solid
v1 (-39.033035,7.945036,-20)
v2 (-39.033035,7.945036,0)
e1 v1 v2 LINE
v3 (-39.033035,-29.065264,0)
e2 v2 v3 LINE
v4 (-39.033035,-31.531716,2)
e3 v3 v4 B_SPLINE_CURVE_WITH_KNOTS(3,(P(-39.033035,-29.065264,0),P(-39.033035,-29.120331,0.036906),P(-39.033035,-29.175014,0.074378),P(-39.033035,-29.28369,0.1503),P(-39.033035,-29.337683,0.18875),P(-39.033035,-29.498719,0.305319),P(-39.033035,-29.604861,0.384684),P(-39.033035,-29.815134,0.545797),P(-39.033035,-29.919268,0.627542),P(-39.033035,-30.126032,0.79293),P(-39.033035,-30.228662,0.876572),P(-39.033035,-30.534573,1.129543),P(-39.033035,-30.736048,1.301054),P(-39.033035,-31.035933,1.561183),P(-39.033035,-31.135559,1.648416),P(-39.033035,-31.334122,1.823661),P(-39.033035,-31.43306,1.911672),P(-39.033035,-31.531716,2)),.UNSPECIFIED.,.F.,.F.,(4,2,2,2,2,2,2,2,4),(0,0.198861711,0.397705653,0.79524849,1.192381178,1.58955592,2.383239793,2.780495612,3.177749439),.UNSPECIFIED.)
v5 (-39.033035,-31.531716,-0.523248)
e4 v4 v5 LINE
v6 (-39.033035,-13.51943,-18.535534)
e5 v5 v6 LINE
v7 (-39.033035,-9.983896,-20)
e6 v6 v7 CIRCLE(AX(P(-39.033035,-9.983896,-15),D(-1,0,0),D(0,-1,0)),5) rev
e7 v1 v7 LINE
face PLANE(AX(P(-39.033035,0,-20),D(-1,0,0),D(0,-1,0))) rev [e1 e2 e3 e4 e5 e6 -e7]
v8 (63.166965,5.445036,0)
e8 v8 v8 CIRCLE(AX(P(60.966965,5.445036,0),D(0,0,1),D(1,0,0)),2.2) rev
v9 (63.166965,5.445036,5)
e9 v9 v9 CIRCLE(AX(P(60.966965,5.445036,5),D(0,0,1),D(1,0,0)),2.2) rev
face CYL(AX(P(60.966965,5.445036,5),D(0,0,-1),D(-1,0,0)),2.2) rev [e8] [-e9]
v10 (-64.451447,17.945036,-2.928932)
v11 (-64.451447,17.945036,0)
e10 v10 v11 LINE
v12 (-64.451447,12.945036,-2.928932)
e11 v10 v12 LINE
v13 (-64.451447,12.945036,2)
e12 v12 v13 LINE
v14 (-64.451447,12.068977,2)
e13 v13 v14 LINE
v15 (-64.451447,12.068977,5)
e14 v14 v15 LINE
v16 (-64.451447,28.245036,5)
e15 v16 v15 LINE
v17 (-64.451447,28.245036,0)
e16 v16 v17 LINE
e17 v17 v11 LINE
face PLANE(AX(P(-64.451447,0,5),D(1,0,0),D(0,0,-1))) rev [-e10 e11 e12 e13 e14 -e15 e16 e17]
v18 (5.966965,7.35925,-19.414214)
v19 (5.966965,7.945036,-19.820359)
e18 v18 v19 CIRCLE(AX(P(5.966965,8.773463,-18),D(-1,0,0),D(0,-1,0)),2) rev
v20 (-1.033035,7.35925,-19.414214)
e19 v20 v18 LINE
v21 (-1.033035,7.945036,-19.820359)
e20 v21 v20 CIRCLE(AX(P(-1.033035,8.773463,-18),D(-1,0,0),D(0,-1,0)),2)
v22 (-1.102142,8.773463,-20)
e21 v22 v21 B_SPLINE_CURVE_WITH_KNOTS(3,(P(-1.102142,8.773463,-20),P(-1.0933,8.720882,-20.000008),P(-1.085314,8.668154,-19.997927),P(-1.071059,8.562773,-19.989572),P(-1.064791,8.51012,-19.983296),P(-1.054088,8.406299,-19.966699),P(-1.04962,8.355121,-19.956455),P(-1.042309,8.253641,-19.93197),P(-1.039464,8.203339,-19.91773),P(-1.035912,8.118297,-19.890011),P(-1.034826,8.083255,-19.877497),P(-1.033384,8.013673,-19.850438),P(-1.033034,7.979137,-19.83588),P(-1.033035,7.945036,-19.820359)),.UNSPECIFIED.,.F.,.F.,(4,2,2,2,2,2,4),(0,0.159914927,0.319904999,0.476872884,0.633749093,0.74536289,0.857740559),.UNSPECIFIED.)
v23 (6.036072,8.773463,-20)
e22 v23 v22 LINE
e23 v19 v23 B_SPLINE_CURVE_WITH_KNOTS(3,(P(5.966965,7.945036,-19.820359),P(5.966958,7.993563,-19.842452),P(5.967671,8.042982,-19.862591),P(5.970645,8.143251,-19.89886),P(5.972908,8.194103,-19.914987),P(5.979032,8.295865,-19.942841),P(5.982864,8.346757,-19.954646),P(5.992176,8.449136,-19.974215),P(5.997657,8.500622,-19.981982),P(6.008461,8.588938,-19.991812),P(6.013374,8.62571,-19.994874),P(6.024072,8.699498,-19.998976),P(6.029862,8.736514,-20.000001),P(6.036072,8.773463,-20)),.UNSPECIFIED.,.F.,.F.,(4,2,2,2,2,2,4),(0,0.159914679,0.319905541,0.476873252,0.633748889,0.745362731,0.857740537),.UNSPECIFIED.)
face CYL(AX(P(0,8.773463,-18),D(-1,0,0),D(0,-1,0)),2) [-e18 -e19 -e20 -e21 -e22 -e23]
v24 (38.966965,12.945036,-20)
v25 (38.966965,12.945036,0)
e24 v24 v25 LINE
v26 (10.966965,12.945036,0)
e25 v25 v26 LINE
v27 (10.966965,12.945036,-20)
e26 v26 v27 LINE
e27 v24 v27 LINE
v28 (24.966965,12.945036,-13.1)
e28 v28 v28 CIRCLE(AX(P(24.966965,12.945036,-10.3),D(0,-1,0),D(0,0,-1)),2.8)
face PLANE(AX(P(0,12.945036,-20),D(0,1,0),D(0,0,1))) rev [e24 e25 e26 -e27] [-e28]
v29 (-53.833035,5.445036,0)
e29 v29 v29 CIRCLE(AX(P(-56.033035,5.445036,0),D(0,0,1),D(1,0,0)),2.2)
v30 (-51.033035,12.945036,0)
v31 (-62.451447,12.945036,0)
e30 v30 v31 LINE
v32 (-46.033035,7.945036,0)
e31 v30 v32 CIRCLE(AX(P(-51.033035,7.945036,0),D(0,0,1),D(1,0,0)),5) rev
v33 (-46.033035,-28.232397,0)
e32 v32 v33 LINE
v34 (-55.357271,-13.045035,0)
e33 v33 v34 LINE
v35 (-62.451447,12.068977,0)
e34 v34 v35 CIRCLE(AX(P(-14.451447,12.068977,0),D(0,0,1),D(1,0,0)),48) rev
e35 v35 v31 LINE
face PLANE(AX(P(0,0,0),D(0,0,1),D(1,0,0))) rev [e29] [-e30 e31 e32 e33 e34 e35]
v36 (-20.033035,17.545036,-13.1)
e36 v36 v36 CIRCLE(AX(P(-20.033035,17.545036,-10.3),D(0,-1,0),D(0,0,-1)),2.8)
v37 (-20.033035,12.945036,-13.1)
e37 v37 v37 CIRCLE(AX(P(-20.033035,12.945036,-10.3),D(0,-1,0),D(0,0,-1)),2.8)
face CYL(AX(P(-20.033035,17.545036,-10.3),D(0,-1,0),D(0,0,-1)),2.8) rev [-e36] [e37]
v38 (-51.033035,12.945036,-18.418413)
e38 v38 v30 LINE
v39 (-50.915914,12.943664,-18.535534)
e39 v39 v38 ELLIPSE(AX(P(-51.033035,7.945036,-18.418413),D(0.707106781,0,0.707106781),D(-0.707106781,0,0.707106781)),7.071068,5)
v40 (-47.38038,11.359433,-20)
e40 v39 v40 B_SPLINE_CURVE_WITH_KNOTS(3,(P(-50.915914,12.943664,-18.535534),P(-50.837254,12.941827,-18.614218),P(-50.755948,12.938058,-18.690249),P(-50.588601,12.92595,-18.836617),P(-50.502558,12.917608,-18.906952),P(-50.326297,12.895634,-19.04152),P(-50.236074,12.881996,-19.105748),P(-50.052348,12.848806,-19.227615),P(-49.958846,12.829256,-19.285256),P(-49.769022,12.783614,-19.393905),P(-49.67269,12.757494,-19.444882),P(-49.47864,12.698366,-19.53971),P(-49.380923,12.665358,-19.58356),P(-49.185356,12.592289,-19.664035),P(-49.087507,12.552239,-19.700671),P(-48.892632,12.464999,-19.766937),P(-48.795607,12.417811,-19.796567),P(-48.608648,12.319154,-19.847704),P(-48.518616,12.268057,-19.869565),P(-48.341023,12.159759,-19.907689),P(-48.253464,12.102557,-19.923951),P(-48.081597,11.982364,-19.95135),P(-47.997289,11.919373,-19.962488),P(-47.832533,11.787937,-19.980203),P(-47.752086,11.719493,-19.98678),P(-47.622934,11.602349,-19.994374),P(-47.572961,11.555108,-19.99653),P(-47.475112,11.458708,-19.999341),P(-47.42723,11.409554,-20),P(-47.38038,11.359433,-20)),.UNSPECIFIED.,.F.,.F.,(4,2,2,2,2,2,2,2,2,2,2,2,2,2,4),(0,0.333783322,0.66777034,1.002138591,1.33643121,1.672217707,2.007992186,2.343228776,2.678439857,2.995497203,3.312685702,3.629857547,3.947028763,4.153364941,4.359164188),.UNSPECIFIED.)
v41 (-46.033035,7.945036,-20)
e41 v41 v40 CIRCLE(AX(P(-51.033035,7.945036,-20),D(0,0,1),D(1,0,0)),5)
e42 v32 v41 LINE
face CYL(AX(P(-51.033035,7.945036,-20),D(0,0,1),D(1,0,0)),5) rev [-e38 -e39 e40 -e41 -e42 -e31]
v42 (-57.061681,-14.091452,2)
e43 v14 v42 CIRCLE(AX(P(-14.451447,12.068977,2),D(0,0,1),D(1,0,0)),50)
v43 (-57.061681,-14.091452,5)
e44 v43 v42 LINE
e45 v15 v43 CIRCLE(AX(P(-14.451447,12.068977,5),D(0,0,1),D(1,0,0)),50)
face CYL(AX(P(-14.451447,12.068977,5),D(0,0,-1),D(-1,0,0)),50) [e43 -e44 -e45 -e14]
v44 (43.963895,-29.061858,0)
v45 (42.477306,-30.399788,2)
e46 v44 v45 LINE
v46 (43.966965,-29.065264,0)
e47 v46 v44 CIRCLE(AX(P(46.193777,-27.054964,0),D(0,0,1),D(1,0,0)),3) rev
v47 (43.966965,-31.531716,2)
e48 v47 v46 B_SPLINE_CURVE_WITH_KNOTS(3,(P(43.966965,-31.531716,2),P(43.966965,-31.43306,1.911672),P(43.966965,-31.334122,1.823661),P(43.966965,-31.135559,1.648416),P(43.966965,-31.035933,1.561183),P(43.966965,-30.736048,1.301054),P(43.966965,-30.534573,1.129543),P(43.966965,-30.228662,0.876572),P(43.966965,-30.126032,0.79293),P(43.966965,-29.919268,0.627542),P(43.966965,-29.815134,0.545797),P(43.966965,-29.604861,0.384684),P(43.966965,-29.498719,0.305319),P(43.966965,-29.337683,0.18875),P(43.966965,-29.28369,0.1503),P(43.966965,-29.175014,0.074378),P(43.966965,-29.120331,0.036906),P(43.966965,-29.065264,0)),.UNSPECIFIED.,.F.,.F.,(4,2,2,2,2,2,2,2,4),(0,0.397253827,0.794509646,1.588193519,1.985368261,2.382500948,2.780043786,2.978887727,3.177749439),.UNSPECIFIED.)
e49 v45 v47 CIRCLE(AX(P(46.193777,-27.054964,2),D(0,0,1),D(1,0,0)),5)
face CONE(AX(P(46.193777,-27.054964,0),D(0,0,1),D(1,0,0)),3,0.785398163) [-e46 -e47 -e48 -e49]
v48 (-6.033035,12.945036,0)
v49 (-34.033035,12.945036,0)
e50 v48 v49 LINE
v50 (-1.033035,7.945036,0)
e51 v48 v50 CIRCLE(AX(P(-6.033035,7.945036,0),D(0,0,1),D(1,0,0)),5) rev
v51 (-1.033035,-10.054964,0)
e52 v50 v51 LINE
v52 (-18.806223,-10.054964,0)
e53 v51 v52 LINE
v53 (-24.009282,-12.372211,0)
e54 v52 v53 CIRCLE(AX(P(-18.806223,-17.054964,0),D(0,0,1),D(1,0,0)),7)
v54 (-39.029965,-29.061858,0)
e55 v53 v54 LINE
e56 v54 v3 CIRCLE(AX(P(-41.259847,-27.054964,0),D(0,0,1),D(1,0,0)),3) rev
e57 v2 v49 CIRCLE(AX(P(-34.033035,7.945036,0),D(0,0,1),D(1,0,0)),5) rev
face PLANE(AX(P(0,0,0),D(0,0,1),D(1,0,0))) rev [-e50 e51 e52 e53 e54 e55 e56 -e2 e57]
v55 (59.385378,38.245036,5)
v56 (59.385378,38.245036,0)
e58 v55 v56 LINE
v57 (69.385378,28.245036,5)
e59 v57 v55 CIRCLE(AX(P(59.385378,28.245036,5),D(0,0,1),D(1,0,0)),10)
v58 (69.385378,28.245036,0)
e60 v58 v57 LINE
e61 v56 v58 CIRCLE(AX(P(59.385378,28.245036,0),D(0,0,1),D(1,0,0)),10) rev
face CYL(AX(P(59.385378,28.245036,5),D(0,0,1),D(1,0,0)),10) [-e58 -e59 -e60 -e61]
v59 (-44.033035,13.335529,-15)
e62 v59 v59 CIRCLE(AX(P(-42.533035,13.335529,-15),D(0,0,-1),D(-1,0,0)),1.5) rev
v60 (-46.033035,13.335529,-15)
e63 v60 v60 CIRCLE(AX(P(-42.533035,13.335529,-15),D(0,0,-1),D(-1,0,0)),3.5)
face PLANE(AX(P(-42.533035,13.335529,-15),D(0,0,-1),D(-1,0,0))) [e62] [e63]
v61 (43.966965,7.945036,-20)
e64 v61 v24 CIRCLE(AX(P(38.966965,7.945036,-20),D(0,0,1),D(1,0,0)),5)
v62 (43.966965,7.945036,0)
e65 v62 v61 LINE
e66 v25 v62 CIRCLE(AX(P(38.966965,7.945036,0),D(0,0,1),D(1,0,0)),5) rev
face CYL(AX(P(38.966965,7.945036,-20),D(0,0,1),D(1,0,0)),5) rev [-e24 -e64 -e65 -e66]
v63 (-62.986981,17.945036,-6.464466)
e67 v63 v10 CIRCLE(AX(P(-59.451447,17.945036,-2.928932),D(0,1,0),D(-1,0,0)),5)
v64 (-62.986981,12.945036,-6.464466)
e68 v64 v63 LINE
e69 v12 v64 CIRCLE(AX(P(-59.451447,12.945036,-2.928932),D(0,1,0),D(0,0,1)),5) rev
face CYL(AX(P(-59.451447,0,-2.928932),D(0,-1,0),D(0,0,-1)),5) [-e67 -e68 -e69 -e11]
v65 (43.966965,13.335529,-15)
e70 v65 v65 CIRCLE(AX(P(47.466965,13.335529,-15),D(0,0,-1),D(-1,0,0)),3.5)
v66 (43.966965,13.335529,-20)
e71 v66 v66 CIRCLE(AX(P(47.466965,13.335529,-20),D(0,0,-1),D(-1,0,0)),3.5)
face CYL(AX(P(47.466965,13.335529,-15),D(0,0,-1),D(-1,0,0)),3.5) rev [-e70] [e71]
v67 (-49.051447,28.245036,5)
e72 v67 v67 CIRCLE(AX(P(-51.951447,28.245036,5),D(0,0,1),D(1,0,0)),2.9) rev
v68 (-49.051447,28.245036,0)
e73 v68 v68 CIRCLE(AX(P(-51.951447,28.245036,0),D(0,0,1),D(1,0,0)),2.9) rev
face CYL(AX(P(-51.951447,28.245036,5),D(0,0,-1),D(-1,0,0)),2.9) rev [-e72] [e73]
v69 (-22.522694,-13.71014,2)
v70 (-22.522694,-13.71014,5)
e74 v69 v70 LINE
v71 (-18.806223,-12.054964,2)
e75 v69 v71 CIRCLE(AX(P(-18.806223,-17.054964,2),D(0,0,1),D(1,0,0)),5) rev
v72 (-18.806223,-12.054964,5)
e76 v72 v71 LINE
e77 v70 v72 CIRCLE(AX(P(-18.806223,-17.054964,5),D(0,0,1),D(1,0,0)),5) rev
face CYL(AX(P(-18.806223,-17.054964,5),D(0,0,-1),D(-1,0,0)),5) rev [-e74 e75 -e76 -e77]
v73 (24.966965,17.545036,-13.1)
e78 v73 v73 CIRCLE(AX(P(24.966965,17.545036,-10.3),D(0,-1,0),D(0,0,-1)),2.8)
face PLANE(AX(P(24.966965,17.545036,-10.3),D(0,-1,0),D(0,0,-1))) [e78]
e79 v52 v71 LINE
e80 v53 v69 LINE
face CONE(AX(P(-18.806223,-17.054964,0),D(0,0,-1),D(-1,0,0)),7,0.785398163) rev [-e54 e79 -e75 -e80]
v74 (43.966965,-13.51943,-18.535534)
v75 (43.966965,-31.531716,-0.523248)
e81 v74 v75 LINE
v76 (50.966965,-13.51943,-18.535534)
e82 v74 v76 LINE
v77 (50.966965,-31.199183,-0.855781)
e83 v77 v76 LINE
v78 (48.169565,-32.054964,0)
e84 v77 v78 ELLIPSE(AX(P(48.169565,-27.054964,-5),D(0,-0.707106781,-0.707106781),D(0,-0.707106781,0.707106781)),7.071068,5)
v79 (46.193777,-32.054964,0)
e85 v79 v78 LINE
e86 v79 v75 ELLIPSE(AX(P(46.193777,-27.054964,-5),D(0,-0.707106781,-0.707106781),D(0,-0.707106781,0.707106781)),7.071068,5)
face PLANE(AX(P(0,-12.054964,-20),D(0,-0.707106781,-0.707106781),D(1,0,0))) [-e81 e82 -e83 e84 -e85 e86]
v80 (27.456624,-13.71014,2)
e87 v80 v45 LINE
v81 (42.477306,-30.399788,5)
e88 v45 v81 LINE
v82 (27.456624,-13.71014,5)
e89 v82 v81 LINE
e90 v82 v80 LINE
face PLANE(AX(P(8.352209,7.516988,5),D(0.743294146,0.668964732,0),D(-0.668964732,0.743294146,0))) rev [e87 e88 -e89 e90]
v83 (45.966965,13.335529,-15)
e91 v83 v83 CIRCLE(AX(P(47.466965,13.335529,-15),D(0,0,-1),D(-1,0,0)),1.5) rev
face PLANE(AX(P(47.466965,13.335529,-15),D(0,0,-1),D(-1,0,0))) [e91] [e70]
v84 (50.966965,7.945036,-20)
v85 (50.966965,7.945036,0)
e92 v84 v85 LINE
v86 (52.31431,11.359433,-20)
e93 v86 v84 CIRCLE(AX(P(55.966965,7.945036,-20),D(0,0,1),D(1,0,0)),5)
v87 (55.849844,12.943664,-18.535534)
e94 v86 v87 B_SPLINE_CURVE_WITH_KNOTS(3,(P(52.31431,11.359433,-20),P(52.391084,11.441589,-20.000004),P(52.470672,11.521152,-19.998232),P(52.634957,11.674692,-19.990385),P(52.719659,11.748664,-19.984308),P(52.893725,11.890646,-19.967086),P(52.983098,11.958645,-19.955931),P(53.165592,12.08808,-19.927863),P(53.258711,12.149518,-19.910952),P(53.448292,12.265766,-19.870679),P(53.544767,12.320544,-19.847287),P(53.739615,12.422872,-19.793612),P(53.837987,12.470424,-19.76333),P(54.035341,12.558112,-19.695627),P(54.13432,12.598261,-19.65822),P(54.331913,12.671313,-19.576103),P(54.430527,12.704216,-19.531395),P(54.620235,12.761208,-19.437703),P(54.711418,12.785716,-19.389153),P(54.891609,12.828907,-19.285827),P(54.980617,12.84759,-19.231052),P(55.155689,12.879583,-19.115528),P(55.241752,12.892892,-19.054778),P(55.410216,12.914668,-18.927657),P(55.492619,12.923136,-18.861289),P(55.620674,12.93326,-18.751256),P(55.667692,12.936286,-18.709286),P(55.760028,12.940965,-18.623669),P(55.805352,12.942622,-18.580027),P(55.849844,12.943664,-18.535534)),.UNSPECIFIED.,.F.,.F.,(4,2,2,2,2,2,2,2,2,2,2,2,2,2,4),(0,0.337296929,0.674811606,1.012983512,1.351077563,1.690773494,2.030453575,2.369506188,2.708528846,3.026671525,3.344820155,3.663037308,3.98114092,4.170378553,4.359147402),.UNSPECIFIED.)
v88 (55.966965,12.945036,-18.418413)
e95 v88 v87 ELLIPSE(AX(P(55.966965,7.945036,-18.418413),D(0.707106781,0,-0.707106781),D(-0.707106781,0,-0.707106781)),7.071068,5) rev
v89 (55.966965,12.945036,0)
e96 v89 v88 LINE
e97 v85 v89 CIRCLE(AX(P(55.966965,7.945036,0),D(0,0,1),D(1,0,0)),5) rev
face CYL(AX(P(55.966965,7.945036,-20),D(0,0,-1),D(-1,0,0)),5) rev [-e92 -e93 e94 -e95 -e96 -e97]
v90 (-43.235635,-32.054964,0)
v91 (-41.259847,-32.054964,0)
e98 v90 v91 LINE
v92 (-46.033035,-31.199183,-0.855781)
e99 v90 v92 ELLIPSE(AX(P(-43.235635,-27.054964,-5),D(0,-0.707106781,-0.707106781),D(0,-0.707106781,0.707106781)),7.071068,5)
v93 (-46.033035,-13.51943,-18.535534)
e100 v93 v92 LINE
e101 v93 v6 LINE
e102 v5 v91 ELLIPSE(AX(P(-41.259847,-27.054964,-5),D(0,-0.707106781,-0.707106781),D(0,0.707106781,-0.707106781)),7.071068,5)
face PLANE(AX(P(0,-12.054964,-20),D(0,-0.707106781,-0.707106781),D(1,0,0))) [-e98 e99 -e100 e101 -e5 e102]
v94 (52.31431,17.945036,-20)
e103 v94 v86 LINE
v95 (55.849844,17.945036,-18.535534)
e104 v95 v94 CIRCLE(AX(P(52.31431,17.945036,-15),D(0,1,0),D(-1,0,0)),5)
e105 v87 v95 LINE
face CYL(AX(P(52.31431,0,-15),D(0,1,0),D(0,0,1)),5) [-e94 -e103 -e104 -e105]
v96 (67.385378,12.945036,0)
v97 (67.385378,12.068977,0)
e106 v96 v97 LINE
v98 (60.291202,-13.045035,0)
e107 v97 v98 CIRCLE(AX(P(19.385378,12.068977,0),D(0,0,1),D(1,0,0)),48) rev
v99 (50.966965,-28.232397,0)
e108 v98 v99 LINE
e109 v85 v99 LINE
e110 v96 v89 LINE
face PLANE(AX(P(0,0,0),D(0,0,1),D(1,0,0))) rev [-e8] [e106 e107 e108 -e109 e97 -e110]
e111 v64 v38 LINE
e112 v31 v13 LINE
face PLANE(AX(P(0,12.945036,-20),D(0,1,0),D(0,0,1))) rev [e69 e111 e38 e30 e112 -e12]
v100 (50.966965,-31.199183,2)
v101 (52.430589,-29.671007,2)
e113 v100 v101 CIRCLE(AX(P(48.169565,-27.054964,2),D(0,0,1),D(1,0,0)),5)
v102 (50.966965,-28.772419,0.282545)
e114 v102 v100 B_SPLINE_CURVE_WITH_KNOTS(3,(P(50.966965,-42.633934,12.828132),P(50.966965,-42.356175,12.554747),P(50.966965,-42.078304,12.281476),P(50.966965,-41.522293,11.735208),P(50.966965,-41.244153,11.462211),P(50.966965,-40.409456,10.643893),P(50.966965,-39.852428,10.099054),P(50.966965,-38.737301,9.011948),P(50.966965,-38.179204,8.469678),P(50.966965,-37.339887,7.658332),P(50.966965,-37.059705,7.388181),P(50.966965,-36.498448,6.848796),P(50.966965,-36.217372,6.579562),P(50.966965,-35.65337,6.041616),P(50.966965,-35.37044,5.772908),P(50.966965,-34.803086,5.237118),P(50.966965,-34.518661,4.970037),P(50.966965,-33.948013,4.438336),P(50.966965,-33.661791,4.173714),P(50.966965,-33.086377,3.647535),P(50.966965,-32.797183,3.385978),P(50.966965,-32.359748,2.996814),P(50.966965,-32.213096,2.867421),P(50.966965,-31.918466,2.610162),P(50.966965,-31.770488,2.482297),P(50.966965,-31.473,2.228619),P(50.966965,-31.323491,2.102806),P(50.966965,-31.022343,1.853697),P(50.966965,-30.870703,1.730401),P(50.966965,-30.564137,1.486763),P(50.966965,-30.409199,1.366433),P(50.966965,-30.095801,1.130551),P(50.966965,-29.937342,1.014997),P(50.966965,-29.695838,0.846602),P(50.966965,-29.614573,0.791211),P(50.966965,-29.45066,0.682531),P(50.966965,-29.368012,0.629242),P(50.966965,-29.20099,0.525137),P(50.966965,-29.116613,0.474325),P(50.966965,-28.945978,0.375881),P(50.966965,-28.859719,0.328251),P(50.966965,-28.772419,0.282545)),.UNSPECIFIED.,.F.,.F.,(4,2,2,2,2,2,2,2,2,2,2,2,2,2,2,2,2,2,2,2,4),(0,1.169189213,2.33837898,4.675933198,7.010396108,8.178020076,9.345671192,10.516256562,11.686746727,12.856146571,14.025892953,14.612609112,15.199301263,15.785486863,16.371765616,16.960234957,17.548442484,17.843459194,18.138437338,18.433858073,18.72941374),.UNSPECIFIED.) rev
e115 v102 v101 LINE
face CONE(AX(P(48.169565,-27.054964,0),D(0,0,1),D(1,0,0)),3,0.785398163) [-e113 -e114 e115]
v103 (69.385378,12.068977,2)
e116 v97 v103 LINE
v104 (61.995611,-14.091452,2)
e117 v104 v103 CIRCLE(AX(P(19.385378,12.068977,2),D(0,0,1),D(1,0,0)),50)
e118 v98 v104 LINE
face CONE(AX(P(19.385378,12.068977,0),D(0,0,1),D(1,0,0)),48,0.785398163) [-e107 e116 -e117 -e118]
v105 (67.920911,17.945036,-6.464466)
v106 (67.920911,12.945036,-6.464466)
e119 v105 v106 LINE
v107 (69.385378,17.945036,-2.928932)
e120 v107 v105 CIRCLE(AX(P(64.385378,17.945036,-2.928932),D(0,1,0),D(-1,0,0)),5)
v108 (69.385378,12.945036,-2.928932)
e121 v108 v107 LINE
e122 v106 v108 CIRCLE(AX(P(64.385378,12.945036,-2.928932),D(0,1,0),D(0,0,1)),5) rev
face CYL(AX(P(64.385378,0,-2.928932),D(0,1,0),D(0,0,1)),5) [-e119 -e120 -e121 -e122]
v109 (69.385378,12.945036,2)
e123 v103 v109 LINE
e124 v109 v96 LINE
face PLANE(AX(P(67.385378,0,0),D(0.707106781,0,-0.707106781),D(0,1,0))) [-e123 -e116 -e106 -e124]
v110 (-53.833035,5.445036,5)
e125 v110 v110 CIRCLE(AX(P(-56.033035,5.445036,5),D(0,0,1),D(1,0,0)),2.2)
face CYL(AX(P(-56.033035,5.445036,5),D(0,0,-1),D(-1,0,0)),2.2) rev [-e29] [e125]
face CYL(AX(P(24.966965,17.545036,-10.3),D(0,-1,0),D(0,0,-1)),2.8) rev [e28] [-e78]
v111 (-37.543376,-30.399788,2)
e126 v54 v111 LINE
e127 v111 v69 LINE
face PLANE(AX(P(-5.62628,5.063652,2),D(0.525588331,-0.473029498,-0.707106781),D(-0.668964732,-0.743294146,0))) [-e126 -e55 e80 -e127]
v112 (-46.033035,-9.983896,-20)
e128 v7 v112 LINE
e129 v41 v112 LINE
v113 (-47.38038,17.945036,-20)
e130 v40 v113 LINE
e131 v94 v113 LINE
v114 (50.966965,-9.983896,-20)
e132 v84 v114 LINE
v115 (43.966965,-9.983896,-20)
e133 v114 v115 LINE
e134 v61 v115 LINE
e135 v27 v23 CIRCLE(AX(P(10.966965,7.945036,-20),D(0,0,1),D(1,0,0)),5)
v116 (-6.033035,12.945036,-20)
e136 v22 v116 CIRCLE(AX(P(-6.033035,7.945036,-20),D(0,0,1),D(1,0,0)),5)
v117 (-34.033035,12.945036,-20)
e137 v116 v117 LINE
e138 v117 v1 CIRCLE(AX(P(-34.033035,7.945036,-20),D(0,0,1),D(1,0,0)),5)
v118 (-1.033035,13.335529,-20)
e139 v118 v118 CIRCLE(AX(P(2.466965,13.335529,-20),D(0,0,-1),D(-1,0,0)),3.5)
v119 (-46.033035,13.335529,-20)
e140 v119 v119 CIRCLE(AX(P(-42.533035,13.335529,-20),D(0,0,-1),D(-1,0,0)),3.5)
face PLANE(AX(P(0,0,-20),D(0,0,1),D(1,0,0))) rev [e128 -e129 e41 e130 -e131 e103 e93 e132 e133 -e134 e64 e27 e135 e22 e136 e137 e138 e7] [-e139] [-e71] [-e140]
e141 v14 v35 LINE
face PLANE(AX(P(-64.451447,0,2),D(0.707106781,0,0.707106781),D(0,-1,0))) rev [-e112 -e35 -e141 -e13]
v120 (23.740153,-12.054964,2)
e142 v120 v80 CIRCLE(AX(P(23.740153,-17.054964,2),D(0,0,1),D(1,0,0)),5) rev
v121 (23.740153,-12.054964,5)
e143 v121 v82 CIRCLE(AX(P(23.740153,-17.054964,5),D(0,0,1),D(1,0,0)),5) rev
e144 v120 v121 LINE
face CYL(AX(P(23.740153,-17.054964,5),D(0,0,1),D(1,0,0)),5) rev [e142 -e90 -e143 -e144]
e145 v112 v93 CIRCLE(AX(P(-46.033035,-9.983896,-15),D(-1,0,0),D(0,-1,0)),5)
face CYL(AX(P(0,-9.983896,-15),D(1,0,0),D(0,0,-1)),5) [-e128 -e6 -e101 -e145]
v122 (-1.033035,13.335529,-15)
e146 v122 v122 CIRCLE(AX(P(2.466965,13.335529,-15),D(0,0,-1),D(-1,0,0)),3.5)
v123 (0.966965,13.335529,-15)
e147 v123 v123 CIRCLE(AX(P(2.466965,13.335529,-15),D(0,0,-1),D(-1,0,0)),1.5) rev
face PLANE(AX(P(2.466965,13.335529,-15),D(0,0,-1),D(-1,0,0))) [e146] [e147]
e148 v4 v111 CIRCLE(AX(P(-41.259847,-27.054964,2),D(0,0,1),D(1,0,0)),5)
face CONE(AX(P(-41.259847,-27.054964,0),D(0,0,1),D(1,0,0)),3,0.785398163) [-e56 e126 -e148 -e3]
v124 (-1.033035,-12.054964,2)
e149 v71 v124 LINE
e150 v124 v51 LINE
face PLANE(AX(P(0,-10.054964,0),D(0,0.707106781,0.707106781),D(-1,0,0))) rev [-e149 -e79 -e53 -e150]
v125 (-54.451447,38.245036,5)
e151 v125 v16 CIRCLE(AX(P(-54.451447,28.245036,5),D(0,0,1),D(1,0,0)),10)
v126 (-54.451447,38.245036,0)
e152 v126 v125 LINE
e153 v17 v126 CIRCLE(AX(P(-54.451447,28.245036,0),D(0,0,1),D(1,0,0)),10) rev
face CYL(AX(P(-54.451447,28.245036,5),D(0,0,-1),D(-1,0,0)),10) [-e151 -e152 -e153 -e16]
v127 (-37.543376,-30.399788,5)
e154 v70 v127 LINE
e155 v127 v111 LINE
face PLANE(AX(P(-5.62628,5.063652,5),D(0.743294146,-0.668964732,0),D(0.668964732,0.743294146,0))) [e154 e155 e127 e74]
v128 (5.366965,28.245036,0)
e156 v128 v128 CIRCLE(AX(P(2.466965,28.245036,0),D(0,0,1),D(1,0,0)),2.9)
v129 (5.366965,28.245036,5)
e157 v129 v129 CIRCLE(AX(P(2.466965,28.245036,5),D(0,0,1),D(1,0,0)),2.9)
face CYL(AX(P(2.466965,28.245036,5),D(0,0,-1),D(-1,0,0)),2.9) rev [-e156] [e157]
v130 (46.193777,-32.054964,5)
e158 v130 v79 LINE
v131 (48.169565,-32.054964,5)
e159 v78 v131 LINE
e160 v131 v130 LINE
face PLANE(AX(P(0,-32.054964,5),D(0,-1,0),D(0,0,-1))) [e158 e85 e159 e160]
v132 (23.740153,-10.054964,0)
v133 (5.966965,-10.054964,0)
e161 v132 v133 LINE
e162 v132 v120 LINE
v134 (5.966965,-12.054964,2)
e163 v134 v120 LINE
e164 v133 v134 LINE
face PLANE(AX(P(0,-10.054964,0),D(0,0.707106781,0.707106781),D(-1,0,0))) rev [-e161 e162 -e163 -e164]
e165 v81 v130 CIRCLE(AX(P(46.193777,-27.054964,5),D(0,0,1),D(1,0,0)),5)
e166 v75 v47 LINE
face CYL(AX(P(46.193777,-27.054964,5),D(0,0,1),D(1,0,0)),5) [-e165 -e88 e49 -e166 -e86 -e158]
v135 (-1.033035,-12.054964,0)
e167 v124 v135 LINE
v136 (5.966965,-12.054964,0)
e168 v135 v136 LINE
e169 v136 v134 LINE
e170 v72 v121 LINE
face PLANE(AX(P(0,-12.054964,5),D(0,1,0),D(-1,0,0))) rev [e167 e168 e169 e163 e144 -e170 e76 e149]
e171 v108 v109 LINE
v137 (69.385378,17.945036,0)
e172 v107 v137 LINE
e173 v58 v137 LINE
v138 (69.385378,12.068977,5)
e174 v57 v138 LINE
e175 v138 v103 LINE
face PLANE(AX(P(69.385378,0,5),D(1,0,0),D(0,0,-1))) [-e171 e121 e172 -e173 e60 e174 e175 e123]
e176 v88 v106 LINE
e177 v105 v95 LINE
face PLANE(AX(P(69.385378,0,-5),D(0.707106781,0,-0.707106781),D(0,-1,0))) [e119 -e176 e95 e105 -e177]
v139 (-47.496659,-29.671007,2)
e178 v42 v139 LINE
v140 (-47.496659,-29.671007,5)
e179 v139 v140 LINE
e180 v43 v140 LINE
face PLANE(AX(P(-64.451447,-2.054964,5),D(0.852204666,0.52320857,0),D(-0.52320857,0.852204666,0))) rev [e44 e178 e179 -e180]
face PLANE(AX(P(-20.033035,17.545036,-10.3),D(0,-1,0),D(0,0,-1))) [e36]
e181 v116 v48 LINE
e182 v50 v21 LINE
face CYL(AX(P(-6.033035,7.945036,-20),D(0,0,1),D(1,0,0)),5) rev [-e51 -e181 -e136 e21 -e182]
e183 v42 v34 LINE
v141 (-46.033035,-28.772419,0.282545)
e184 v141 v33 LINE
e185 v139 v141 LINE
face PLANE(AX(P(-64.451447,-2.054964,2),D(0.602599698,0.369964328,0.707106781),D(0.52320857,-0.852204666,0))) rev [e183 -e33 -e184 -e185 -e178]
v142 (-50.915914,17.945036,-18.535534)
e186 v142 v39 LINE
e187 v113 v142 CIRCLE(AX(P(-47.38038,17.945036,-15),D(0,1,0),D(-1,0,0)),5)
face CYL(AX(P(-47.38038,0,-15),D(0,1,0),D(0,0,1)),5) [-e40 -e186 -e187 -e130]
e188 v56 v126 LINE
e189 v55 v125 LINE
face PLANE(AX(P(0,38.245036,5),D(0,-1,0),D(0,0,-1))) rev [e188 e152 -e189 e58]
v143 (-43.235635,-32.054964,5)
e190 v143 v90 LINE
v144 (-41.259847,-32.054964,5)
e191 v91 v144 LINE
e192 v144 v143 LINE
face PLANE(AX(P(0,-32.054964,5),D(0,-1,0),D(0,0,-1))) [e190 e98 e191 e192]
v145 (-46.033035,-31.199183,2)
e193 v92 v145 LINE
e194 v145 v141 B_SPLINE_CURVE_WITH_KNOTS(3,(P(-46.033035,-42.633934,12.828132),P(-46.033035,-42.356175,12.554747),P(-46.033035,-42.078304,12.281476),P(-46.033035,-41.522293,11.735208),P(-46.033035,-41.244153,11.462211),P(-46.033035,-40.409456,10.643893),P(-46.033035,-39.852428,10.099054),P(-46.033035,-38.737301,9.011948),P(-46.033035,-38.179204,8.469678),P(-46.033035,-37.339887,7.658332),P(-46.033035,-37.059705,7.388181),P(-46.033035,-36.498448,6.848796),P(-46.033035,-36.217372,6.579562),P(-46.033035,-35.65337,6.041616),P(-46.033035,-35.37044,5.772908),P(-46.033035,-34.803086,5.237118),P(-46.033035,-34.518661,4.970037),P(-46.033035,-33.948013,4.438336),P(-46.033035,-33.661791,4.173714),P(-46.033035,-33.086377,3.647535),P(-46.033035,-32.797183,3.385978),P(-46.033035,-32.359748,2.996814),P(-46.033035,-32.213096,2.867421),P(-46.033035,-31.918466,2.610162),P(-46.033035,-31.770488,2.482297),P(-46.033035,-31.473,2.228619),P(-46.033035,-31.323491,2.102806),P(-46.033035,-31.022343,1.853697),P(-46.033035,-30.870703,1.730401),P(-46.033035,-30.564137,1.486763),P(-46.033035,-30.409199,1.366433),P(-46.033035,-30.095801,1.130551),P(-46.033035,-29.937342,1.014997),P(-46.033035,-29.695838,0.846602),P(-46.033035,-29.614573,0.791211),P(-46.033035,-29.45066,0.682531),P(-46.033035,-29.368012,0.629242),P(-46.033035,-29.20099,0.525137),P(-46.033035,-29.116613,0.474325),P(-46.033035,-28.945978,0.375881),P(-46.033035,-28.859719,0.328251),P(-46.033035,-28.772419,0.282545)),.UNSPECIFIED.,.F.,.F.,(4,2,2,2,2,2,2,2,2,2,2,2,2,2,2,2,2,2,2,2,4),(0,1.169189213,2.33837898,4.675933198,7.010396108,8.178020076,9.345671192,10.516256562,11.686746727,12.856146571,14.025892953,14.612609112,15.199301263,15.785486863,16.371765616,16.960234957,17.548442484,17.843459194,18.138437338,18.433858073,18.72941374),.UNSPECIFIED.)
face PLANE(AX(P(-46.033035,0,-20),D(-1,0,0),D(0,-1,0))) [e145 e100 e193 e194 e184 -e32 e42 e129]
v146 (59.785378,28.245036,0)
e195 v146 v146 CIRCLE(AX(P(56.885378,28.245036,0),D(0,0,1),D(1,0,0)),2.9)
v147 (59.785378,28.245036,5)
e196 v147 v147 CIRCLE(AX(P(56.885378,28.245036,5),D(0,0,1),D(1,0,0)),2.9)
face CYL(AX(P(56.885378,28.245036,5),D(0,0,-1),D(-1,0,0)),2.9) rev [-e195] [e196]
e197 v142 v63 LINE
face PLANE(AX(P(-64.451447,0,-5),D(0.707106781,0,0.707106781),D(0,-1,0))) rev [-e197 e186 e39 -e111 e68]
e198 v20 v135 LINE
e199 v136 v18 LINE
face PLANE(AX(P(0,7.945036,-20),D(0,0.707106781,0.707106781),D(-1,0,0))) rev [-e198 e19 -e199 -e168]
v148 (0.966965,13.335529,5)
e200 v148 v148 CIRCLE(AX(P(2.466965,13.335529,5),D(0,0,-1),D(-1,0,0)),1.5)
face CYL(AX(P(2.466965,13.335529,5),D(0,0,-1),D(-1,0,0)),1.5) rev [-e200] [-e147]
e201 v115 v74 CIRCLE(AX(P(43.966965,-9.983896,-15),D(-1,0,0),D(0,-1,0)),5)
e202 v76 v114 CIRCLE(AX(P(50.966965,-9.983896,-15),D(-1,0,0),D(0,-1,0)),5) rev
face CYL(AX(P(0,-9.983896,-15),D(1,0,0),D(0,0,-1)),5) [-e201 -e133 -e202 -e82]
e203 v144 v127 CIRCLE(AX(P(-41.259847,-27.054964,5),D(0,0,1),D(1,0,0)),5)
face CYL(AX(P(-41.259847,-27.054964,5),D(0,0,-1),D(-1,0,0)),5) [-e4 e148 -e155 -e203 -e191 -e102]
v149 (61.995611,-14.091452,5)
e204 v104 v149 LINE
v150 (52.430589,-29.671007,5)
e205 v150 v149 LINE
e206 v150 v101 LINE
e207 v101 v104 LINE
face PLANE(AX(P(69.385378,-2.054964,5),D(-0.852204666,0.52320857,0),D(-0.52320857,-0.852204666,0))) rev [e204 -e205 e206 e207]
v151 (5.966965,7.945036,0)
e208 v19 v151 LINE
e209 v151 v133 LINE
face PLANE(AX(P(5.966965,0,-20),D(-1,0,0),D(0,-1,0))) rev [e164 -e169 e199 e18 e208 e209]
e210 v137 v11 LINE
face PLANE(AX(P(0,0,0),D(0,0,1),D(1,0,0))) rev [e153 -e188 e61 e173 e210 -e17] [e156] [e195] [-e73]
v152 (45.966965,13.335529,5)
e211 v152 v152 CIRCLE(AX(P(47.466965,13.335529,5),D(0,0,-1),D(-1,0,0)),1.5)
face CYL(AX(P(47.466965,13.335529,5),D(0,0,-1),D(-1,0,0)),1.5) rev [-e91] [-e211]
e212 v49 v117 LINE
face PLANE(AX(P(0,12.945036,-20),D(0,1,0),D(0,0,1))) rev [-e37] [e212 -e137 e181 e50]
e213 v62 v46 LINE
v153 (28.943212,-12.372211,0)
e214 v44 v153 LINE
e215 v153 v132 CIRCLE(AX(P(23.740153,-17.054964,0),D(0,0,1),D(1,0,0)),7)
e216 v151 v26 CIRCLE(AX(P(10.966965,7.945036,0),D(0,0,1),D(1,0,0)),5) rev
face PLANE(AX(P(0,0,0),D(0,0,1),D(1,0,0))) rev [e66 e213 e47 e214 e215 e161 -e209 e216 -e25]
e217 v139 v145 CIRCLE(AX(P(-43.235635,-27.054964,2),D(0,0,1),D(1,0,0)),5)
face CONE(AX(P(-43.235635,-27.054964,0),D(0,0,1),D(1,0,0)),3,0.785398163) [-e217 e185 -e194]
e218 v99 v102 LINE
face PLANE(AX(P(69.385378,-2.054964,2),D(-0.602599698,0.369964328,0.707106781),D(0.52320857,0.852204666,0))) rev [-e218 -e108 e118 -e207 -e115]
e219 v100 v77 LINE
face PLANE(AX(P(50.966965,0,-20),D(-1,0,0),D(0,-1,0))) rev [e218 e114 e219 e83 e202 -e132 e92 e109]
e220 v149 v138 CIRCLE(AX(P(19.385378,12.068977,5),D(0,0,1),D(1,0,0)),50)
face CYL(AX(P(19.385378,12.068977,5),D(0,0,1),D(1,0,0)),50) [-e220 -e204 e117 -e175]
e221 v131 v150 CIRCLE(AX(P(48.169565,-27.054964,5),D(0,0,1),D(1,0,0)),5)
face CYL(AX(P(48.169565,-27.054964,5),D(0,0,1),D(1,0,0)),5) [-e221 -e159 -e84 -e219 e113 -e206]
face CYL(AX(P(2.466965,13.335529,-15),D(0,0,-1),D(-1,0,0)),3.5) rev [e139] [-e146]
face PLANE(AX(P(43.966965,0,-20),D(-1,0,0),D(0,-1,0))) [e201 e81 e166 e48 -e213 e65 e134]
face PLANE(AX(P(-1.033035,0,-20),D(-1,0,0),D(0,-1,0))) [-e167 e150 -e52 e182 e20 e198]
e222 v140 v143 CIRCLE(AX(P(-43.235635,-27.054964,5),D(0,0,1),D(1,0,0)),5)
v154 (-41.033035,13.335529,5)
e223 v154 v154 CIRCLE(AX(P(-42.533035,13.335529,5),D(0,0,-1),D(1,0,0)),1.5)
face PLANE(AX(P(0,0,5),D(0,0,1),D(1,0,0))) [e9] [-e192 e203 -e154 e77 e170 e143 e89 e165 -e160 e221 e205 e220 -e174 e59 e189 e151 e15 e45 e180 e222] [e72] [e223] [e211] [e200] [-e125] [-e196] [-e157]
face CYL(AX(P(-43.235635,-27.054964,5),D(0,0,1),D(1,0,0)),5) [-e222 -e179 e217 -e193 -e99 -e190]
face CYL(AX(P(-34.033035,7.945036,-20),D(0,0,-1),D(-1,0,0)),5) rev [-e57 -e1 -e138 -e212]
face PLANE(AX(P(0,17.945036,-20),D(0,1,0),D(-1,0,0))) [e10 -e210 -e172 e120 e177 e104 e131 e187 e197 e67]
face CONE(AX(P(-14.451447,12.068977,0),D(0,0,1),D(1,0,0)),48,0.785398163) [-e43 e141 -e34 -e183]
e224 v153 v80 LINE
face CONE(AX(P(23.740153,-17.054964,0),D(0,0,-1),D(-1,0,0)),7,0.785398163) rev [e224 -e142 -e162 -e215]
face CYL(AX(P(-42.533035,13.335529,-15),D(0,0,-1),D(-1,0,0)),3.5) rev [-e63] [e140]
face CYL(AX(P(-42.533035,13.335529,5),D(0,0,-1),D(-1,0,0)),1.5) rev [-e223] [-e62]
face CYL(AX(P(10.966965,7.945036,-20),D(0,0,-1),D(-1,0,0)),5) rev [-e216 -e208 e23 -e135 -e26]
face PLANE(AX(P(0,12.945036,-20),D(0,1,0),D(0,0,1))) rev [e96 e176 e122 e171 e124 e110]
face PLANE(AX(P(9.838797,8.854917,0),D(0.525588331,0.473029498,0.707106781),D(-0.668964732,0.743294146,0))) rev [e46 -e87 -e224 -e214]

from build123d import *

# Parameters (mm, degrees)
SZKIC1_R                    = 2.9
SZKIC1_W                    = 18.41841252
SZKIC1_H                    = 5
SZKIC1_W_2                  = 7
SZKIC1_H_2                  = 45
SZKIC1_R_2                  = 2.2
SZKIC1_W_3                  = 38
DODANIE_WYCI_GNI_CIE1_DEPTH = 5
SZKIC1_3_W                  = 18.41841252
SZKIC1_3_H                  = 5
SZKIC1_3_W_2                = 7
SZKIC1_3_W_3                = 38
SZKIC1_3_H_2                = 45
DODANIE_WYCI_GNI_CIE2_DEPTH = 20
SFAZOWANIE1_SIZE            = 20
SFAZOWANIE2_SIZE            = 15
WYTNIJ_WYCI_GNI_CIE1_DEPTH  = 82.712994064
SZKIC4_W                    = 7
SZKIC4_H                    = 20
WYTNIJ_WYCI_GNI_CIE2_DEPTH  = 84.078356982
SFAZOWANIE3_SIZE            = 20
ZAOKR_GLENIE1_R             = 5
ZAOKR_GLENIE2_R             = 5
ZAOKR_GLENIE3_R             = 10
SZKIC5_R                    = 1.5
WYTNIJ_WYCI_GNI_CIE3_DEPTH  = 84.078356982
SZKIC6_R                    = 3.5
WYTNIJ_WYCI_GNI_CIE4_DEPTH  = 5
ZAOKR_GLENIE4_R             = 2
ZAOKR_GLENIE5_R             = 5
ZAOKR_GLENIE6_R             = 50
SZKIC7_R                    = 2.8
WYTNIJ_WYCI_GNI_CIE5_DEPTH  = 4.6
SFAZOWANIE4_SIZE            = 2


with BuildPart() as part:
    # Szkic1 → Dodanie-wyciągnięcie1 (new body)
    # profile 1 of 15: a face of its own
    with BuildSketch(Plane.XY):
        Polygon((69.385377552, 17.945036029), (69.385377552, 38.245036029), (-64.451447488, 38.245036029), (-64.451447488, 17.945036029), (-46.033034968, 17.945036029), (-39.033034968, 17.945036029), (-1.033034968, 17.945036029), (5.966965032, 17.945036029), (43.966965032, 17.945036029), (50.966965032, 17.945036029), align=None)
        with Locations((-51.951447488, 28.245036029)):
            Circle(SZKIC1_R, mode=Mode.SUBTRACT)
        with Locations((2.466965032, 28.245036029)):
            Circle(SZKIC1_R, mode=Mode.SUBTRACT)
        with Locations((56.885377552, 28.245036029)):
            Circle(SZKIC1_R, mode=Mode.SUBTRACT)
    # profile 2 of 15: a face of its own
    with BuildSketch(Plane.XY):
        with Locations((60.176171292, 15.445036029)):
            Rectangle(SZKIC1_W, SZKIC1_H)
    # profile 3 of 15: a face of its own
    with BuildSketch(Plane.XY):
        with Locations((47.466965032, 15.445036029)):
            Rectangle(SZKIC1_W_2, SZKIC1_H)
    # profile 4 of 15: a face of its own
    with BuildSketch(Plane.XY):
        with Locations((60.176171292, -9.554963971)):
            Rectangle(SZKIC1_W, SZKIC1_H_2)
        with Locations((60.966965032, 5.445036029)):
            Circle(SZKIC1_R_2, mode=Mode.SUBTRACT)
    # profile 5 of 15: a face of its own
    with BuildSketch(Plane.XY):
        with Locations((-55.242241228, 15.445036029)):
            Rectangle(SZKIC1_W, SZKIC1_H)
    # profile 6 of 15: a face of its own
    with BuildSketch(Plane.XY):
        with Locations((24.966965032, 15.445036029)):
            Rectangle(SZKIC1_W_3, SZKIC1_H)
    # profile 7 of 15: a face of its own
    with BuildSketch(Plane.XY):
        with Locations((47.466965032, -9.554963971)):
            Rectangle(SZKIC1_W_2, SZKIC1_H_2)
    # profile 8 of 15: a face of its own
    with BuildSketch(Plane.XY):
        with Locations((-42.533034968, 15.445036029)):
            Rectangle(SZKIC1_W_2, SZKIC1_H)
    # profile 9 of 15: a face of its own
    with BuildSketch(Plane.XY):
        with Locations((-55.242241228, -9.554963971)):
            Rectangle(SZKIC1_W, SZKIC1_H_2)
        with Locations((-56.033034968, 5.445036029)):
            Circle(SZKIC1_R_2, mode=Mode.SUBTRACT)
    # profile 10 of 15: a face of its own
    with BuildSketch(Plane.XY):
        with Locations((2.466965032, 15.445036029)):
            Rectangle(SZKIC1_W_2, SZKIC1_H)
    # profile 11 of 15: a face of its own
    with BuildSketch(Plane.XY):
        with Locations((24.966965032, -9.554963971)):
            Rectangle(SZKIC1_W_3, SZKIC1_H_2)
    # profile 12 of 15: a face of its own
    with BuildSketch(Plane.XY):
        with Locations((-20.033034968, 15.445036029)):
            Rectangle(SZKIC1_W_3, SZKIC1_H)
    # profile 13 of 15: a face of its own
    with BuildSketch(Plane.XY):
        with Locations((-42.533034968, -9.554963971)):
            Rectangle(SZKIC1_W_2, SZKIC1_H_2)
    # profile 14 of 15: a face of its own
    with BuildSketch(Plane.XY):
        with Locations((2.466965032, -9.554963971)):
            Rectangle(SZKIC1_W_2, SZKIC1_H_2)
    # profile 15 of 15: a face of its own
    with BuildSketch(Plane.XY):
        with Locations((-20.033034968, -9.554963971)):
            Rectangle(SZKIC1_W_3, SZKIC1_H_2)
    extrude(amount=DODANIE_WYCI_GNI_CIE1_DEPTH)

    # Szkic1<3> → Dodanie-wyciągnięcie2 (add)
    with BuildSketch(Plane.XY):
        with Locations((-55.242241228, 15.445036029)):
            Rectangle(SZKIC1_3_W, SZKIC1_3_H)
        with Locations((-42.533034968, 15.445036029)):
            Rectangle(SZKIC1_3_W_2, SZKIC1_3_H)
        with Locations((-20.033034968, 15.445036029)):
            Rectangle(SZKIC1_3_W_3, SZKIC1_3_H)
        with Locations((2.466965032, 15.445036029)):
            Rectangle(SZKIC1_3_W_2, SZKIC1_3_H)
        with Locations((24.966965032, 15.445036029)):
            Rectangle(SZKIC1_3_W_3, SZKIC1_3_H)
        with Locations((47.466965032, 15.445036029)):
            Rectangle(SZKIC1_3_W_2, SZKIC1_3_H)
        with Locations((60.176171292, 15.445036029)):
            Rectangle(SZKIC1_3_W, SZKIC1_3_H)
        with Locations((47.466965032, -9.554963971)):
            Rectangle(SZKIC1_3_W_2, SZKIC1_3_H_2)
        with Locations((2.466965032, -9.554963971)):
            Rectangle(SZKIC1_3_W_2, SZKIC1_3_H_2)
        with Locations((-42.533034968, -9.554963971)):
            Rectangle(SZKIC1_3_W_2, SZKIC1_3_H_2)
    extrude(amount=-DODANIE_WYCI_GNI_CIE2_DEPTH)

    # Sfazowanie1
    sfazowanie1_edges = [part.edges().sort_by_distance(p)[0] for p in [
        (47.466965032, -32.054963971, -20),
        (2.466965032, -32.054963971, -20),
        (-42.533034968, -32.054963971, -20),
    ]]
    chamfer(sfazowanie1_edges, length=SFAZOWANIE1_SIZE)

    # Sfazowanie2
    sfazowanie2_edges = [part.edges().sort_by_distance(p)[0] for p in [
        (-64.451447488, 15.445036029, -20),
        (69.385377552, 15.445036029, -20),
    ]]
    chamfer(sfazowanie2_edges, length=SFAZOWANIE2_SIZE)

    # Szkic3 → Wytnij-wyciągnięcie1 (cut, through all)
    with BuildSketch(Plane(origin=(0, 0, 0), x_dir=(-1, 0, 0), z_dir=(0, 0, -1))):
        Polygon((-69.385377552, -2.054963971), (-50.966965032, -32.054963971), (-69.385377552, -32.054963971), align=None)
        Polygon((64.451447488, -32.054963971), (64.451447488, -2.054963971), (46.033034968, -32.054963971), align=None)
    extrude(amount=-WYTNIJ_WYCI_GNI_CIE1_DEPTH, mode=Mode.SUBTRACT)

    # Szkic4 → Wytnij-wyciągnięcie2 (cut, through all)
    with BuildSketch(Plane(origin=(0, 0, -20), x_dir=(-1, 0, 0), z_dir=(0, 0, -1))):
        Polygon((21.033034968, -12.054963971), (-25.966965032, -12.054963971), (-43.966965032, -32.054963971), (39.033034968, -32.054963971), align=None)
        with Locations((-2.466965032, -22.054963971)):
            Rectangle(SZKIC4_W, SZKIC4_H)
    extrude(amount=-WYTNIJ_WYCI_GNI_CIE2_DEPTH, mode=Mode.SUBTRACT)

    # Sfazowanie3
    sfazowanie3_edges = [part.edges().sort_by_distance(p)[0] for p in [
        (2.466965032, -12.054963971, -20),
    ]]
    chamfer(sfazowanie3_edges, length=SFAZOWANIE3_SIZE)

    # Zaokrąglenie1
    zaokr_glenie1_edges = [part.edges().sort_by_distance(p)[0] for p in [
        (-46.033034968, 12.945036029, -10),
        (-39.033034968, 12.945036029, -10),
        (-1.033034968, 12.945036029, -10),
        (5.966965032, 12.945036029, -10),
        (43.966965032, 12.945036029, -10),
        (50.966965032, 12.945036029, -10),
    ]]
    fillet(zaokr_glenie1_edges, radius=ZAOKR_GLENIE1_R)

    # Zaokrąglenie2
    zaokr_glenie2_edges = [part.edges().sort_by_distance(p)[0] for p in [
        (-64.451447488, 15.445036029, -5),
        (54.385377552, 15.316669487, -20),
        (-49.451447488, 15.316669487, -20),
        (69.385377552, 15.445036029, -5),
        (50.966965032, -32.054963971, 2.5),
        (-46.033034968, -32.054963971, 2.5),
        (43.966965032, -32.054963971, 2.5),
        (-39.033034968, -32.054963971, 2.5),
        (-42.533034968, -12.054963971, -20),
        (47.466965032, -12.054963971, -20),
    ]]
    fillet(zaokr_glenie2_edges, radius=ZAOKR_GLENIE2_R)

    # Zaokrąglenie3
    zaokr_glenie3_edges = [part.edges().sort_by_distance(p)[0] for p in [
        (-64.451447488, 38.245036029, 2.5),
        (69.385377552, 38.245036029, 2.5),
    ]]
    fillet(zaokr_glenie3_edges, radius=ZAOKR_GLENIE3_R)

    # Szkic5 → Wytnij-wyciągnięcie3 (cut, through all)
    with BuildSketch(Plane(origin=(0, 0, -20), x_dir=(-1, 0, 0), z_dir=(0, 0, -1))):
        with Locations((-2.466965032, 13.335528763)):
            Circle(SZKIC5_R)
        with Locations((-47.466965032, 13.335528763)):
            Circle(SZKIC5_R)
        with Locations(Location((42.533034968, 13.335528763, 0), (0, 0, 180))):
            Circle(SZKIC5_R)
    extrude(amount=-WYTNIJ_WYCI_GNI_CIE3_DEPTH, mode=Mode.SUBTRACT)

    # Szkic6 → Wytnij-wyciągnięcie4 (cut)
    with BuildSketch(Plane(origin=(0, 0, -20), x_dir=(-1, 0, 0), z_dir=(0, 0, -1))):
        with Locations((-47.466965032, 13.335528763)):
            Circle(SZKIC6_R)
        with Locations((-2.466965032, 13.335528763)):
            Circle(SZKIC6_R)
        with Locations((42.533034968, 13.335528763)):
            Circle(SZKIC6_R)
    extrude(amount=-WYTNIJ_WYCI_GNI_CIE4_DEPTH, mode=Mode.SUBTRACT)

    # Zaokrąglenie4
    zaokr_glenie4_edges = [part.edges().sort_by_distance(p)[0] for p in [
        (2.466965032, 7.945036029, -20),
    ]]
    fillet(zaokr_glenie4_edges, radius=ZAOKR_GLENIE4_R)

    # Zaokrąglenie5
    zaokr_glenie5_edges = [part.edges().sort_by_distance(p)[0] for p in [
        (-21.033034968, -12.054963971, 2.5),
        (25.966965032, -12.054963971, 2.5),
    ]]
    fillet(zaokr_glenie5_edges, radius=ZAOKR_GLENIE5_R)

    # Zaokrąglenie6
    zaokr_glenie6_edges = [part.edges().sort_by_distance(p)[0] for p in [
        (69.385377552, -2.054963971, 2.5),
        (-64.451447488, -2.054963971, 2.5),
    ]]
    fillet(zaokr_glenie6_edges, radius=ZAOKR_GLENIE6_R)

    # Szkic7 → Wytnij-wyciągnięcie5 (cut)
    with BuildSketch(Plane.XZ.offset(-12.945036029)):
        with Locations(Location((24.966965032, -10.3, 0), (0, 0, 270))):
            Circle(SZKIC7_R)
        with Locations(Location((-20.033034968, -10.3, 0), (0, 0, 270))):
            Circle(SZKIC7_R)
    extrude(amount=-WYTNIJ_WYCI_GNI_CIE5_DEPTH, mode=Mode.SUBTRACT)

    # Sfazowanie4
    # the kernel refuses this chamfer: 2 mm, written as the material it takes off along each edge
    with BuildSketch(Plane(origin=(-1.033034968, -12.054963971, 0), x_dir=(0, -0.027495876610586494, 0.9996219169112968), z_dir=(-1, 0, 0)), Plane(origin=(23.740153008, -12.054963971, 0), x_dir=(0, -0.027495876610586487, 0.9996219169112968), z_dir=(-1, 0, 0))) as sfazowanie4_piece_1:
        Polygon((SFAZOWANIE4_SIZE * 0.999621916911, SFAZOWANIE4_SIZE * 0.0274958766106), (-SFAZOWANIE4_SIZE * 0.0274958766106, SFAZOWANIE4_SIZE * 0.999621916911), (0, 0), align=None)
    extrude(amount=17.773187976, mode=Mode.SUBTRACT)
    with BuildSketch(Plane(origin=(-43.23563518, -27.054963971, 0), x_dir=(0.42136088994034965, -0.906893047954761, 0), z_dir=(0.906893047954761, 0.42136088994034965, 0))) as sfazowanie4_piece_2_section:
        Polygon((5, -SFAZOWANIE4_SIZE), (5 - SFAZOWANIE4_SIZE, 0), (5, 0), align=None)
    sfazowanie4_piece_2 = revolve(axis=Axis((-43.23563518, -27.054963971, 0), (0, 0, -1)), revolution_arc=83.372812861, mode=Mode.PRIVATE)
    sfazowanie4_piece_2 = split(sfazowanie4_piece_2, bisect_by=Plane(origin=(-46.033034968, -30.045933354, 0.764134298), z_dir=(-1, 0, 0)), keep=Keep.TOP, mode=Mode.PRIVATE)
    add(sfazowanie4_piece_2, mode=Mode.SUBTRACT)
    with BuildSketch(Plane(origin=(-22.522693676, -13.710140313, 0), x_dir=(0.02043752413058321, -0.01839377171752488, 0.9996219169112968), z_dir=(-0.6689647316224495, -0.7432941462471666, 0)), Plane(origin=(42.477306324, -30.399787629, 0), x_dir=(-0.02043752413058301, -0.018393771717524706, 0.9996219169112968), z_dir=(-0.6689647316224496, 0.7432941462471665, 0))) as sfazowanie4_piece_3:
        Polygon((SFAZOWANIE4_SIZE * 0.999621916911, SFAZOWANIE4_SIZE * 0.0274958766106), (-SFAZOWANIE4_SIZE * 0.0274958766106, SFAZOWANIE4_SIZE * 0.999621916911), (0, 0), align=None)
    extrude(amount=22.453624047, mode=Mode.SUBTRACT)
    with BuildSketch(Plane(origin=(-41.259846992, -27.054963971, 0), x_dir=(-0.5372033961854771, -0.8434527320050539, 0), z_dir=(-0.8434527320050539, 0.5372033961854771, 0))) as sfazowanie4_piece_4_section:
        Polygon((5, SFAZOWANIE4_SIZE), (5 - SFAZOWANIE4_SIZE, 0), (5, 0), align=None)
    sfazowanie4_piece_4 = revolve(axis=Axis((-41.259846992, -27.054963971, 0), (0, 0, 1)), revolution_arc=80.506251571, mode=Mode.PRIVATE)
    sfazowanie4_piece_4 = split(sfazowanie4_piece_4, bisect_by=Plane(origin=(-39.033034968, -30.533722869, 0.745420037), z_dir=(1, 0, 0)), keep=Keep.TOP, mode=Mode.PRIVATE)
    add(sfazowanie4_piece_4, mode=Mode.SUBTRACT)
    with BuildSketch(Plane(origin=(46.193777055, -27.054963971, 0), x_dir=(0.5372033961854854, -0.8434527320050487, 0), z_dir=(0.8434527320050487, 0.5372033961854854, 0))) as sfazowanie4_piece_5_section:
        Polygon((5, -SFAZOWANIE4_SIZE), (5 - SFAZOWANIE4_SIZE, 0), (5, 0), align=None)
    sfazowanie4_piece_5 = revolve(axis=Axis((46.193777055, -27.054963971, 0), (0, 0, -1)), revolution_arc=80.506251571, mode=Mode.PRIVATE)
    sfazowanie4_piece_5 = split(sfazowanie4_piece_5, bisect_by=Plane(origin=(43.966965032, -30.533722869, 0.745420037), z_dir=(-1, 0, 0)), keep=Keep.TOP, mode=Mode.PRIVATE)
    add(sfazowanie4_piece_5, mode=Mode.SUBTRACT)
    with BuildSketch(Plane(origin=(61.995610849, -14.09145196, 0), x_dir=(0.02343211434184364, -0.014386078272250682, 0.9996219169112968), z_dir=(-0.5232085696337507, -0.8522046659469805, 0))) as sfazowanie4_piece_6_section:
        Polygon((SFAZOWANIE4_SIZE * 0.999621916911, SFAZOWANIE4_SIZE * 0.0274958766106), (-SFAZOWANIE4_SIZE * 0.0274958766106, SFAZOWANIE4_SIZE * 0.999621916911), (0, 0), align=None)
    sfazowanie4_piece_6 = extrude(amount=18.281470968, mode=Mode.PRIVATE)
    sfazowanie4_piece_6 = split(sfazowanie4_piece_6, bisect_by=Plane(origin=(50.966965032, -23.432298347, 0.774377274), z_dir=(1, 0, 0)), keep=Keep.TOP, mode=Mode.PRIVATE)
    add(sfazowanie4_piece_6, mode=Mode.SUBTRACT)
    with BuildSketch(Plane(origin=(48.169565244, -27.054963971, 0), x_dir=(-0.4213608899403493, -0.9068930479547611, 0), z_dir=(-0.9068930479547611, 0.4213608899403493, 0))) as sfazowanie4_piece_7_section:
        Polygon((5, SFAZOWANIE4_SIZE), (5 - SFAZOWANIE4_SIZE, 0), (5, 0), align=None)
    sfazowanie4_piece_7 = revolve(axis=Axis((48.169565244, -27.054963971, 0), (0, 0, 1)), revolution_arc=83.372812861, mode=Mode.PRIVATE)
    sfazowanie4_piece_7 = split(sfazowanie4_piece_7, bisect_by=Plane(origin=(50.966965032, -30.045933354, 0.764134298), z_dir=(1, 0, 0)), keep=Keep.TOP, mode=Mode.PRIVATE)
    add(sfazowanie4_piece_7, mode=Mode.SUBTRACT)
    with BuildSketch(Plane(origin=(-64.451447488, 12.068976521, 0), x_dir=(-0.02749587661058217, 0, 0.9996219169112968), z_dir=(0, 1, 0))) as sfazowanie4_piece_8:
        Polygon((SFAZOWANIE4_SIZE * 0.999621916911, SFAZOWANIE4_SIZE * 0.0274958766106), (-SFAZOWANIE4_SIZE * 0.0274958766106, SFAZOWANIE4_SIZE * 0.999621916911), (0, 0), align=None)
    extrude(amount=0.876059508, mode=Mode.SUBTRACT)
    with BuildSketch(Plane(origin=(69.385377552, 12.068976521, 0), x_dir=(0.02749587661058908, 0, 0.9996219169112968), z_dir=(0, 1, 0))) as sfazowanie4_piece_9:
        Polygon((SFAZOWANIE4_SIZE * 0.999621916911, -SFAZOWANIE4_SIZE * 0.0274958766106), (-SFAZOWANIE4_SIZE * 0.0274958766106, -SFAZOWANIE4_SIZE * 0.999621916911), (0, 0), align=None)
    extrude(amount=0.876059508, mode=Mode.SUBTRACT)
    with BuildSketch(Plane(origin=(-18.806222945, -17.054963971, 0), x_dir=(-0.7432941462471667, 0.6689647316224491, 0), z_dir=(-0.6689647316224491, -0.7432941462471667, 0))) as sfazowanie4_piece_10:
        Polygon((5, -SFAZOWANIE4_SIZE), (5 + SFAZOWANIE4_SIZE, 0), (5, 0), align=None)
    revolve(axis=Axis((-18.806222945, -17.054963971, 0), (0, 0, -1)), revolution_arc=48.012787504, mode=Mode.SUBTRACT)
    with BuildSketch(Plane(origin=(23.740153008, -17.054963971, 0), x_dir=(0, 1, 0), z_dir=(-1, 0, 0))) as sfazowanie4_piece_11:
        Polygon((5, -SFAZOWANIE4_SIZE), (5 + SFAZOWANIE4_SIZE, 0), (5, 0), align=None)
    revolve(axis=Axis((23.740153008, -17.054963971, 0), (0, 0, -1)), revolution_arc=48.012787504, mode=Mode.SUBTRACT)
    with BuildSketch(Plane(origin=(19.385377552, 12.068976521, 0), x_dir=(0.8522046659469805, -0.5232085696337508, 0), z_dir=(-0.5232085696337508, -0.8522046659469805, 0))) as sfazowanie4_piece_12:
        Polygon((50, SFAZOWANIE4_SIZE), (50 - SFAZOWANIE4_SIZE, 0), (50, 0), align=None)
    revolve(axis=Axis((19.385377552, 12.068976521, 0), (0, 0, 1)), revolution_arc=31.54772315, mode=Mode.SUBTRACT)
    with BuildSketch(Plane(origin=(-57.061680786, -14.09145196, 0), x_dir=(-0.023432114341843627, -0.014386078272250705, 0.9996219169112968), z_dir=(0.5232085696337515, -0.8522046659469801, 0))) as sfazowanie4_piece_13_section:
        Polygon((SFAZOWANIE4_SIZE * 0.999621916911, -SFAZOWANIE4_SIZE * 0.0274958766106), (-SFAZOWANIE4_SIZE * 0.0274958766106, -SFAZOWANIE4_SIZE * 0.999621916911), (0, 0), align=None)
    sfazowanie4_piece_13 = extrude(amount=18.281470968, mode=Mode.PRIVATE)
    sfazowanie4_piece_13 = split(sfazowanie4_piece_13, bisect_by=Plane(origin=(-46.033034968, -23.432298347, 0.774377274), z_dir=(-1, 0, 0)), keep=Keep.TOP, mode=Mode.PRIVATE)
    add(sfazowanie4_piece_13, mode=Mode.SUBTRACT)
    with BuildSketch(Plane(origin=(-14.451447488, 12.068976521, 0), x_dir=(-0.8522046659469801, -0.5232085696337514, 0), z_dir=(0.5232085696337514, -0.8522046659469801, 0))) as sfazowanie4_piece_14:
        Polygon((50, -SFAZOWANIE4_SIZE), (50 - SFAZOWANIE4_SIZE, 0), (50, 0), align=None)
    revolve(axis=Axis((-14.451447488, 12.068976521, 0), (0, 0, -1)), revolution_arc=31.54772315, mode=Mode.SUBTRACT)


solid = part.part
